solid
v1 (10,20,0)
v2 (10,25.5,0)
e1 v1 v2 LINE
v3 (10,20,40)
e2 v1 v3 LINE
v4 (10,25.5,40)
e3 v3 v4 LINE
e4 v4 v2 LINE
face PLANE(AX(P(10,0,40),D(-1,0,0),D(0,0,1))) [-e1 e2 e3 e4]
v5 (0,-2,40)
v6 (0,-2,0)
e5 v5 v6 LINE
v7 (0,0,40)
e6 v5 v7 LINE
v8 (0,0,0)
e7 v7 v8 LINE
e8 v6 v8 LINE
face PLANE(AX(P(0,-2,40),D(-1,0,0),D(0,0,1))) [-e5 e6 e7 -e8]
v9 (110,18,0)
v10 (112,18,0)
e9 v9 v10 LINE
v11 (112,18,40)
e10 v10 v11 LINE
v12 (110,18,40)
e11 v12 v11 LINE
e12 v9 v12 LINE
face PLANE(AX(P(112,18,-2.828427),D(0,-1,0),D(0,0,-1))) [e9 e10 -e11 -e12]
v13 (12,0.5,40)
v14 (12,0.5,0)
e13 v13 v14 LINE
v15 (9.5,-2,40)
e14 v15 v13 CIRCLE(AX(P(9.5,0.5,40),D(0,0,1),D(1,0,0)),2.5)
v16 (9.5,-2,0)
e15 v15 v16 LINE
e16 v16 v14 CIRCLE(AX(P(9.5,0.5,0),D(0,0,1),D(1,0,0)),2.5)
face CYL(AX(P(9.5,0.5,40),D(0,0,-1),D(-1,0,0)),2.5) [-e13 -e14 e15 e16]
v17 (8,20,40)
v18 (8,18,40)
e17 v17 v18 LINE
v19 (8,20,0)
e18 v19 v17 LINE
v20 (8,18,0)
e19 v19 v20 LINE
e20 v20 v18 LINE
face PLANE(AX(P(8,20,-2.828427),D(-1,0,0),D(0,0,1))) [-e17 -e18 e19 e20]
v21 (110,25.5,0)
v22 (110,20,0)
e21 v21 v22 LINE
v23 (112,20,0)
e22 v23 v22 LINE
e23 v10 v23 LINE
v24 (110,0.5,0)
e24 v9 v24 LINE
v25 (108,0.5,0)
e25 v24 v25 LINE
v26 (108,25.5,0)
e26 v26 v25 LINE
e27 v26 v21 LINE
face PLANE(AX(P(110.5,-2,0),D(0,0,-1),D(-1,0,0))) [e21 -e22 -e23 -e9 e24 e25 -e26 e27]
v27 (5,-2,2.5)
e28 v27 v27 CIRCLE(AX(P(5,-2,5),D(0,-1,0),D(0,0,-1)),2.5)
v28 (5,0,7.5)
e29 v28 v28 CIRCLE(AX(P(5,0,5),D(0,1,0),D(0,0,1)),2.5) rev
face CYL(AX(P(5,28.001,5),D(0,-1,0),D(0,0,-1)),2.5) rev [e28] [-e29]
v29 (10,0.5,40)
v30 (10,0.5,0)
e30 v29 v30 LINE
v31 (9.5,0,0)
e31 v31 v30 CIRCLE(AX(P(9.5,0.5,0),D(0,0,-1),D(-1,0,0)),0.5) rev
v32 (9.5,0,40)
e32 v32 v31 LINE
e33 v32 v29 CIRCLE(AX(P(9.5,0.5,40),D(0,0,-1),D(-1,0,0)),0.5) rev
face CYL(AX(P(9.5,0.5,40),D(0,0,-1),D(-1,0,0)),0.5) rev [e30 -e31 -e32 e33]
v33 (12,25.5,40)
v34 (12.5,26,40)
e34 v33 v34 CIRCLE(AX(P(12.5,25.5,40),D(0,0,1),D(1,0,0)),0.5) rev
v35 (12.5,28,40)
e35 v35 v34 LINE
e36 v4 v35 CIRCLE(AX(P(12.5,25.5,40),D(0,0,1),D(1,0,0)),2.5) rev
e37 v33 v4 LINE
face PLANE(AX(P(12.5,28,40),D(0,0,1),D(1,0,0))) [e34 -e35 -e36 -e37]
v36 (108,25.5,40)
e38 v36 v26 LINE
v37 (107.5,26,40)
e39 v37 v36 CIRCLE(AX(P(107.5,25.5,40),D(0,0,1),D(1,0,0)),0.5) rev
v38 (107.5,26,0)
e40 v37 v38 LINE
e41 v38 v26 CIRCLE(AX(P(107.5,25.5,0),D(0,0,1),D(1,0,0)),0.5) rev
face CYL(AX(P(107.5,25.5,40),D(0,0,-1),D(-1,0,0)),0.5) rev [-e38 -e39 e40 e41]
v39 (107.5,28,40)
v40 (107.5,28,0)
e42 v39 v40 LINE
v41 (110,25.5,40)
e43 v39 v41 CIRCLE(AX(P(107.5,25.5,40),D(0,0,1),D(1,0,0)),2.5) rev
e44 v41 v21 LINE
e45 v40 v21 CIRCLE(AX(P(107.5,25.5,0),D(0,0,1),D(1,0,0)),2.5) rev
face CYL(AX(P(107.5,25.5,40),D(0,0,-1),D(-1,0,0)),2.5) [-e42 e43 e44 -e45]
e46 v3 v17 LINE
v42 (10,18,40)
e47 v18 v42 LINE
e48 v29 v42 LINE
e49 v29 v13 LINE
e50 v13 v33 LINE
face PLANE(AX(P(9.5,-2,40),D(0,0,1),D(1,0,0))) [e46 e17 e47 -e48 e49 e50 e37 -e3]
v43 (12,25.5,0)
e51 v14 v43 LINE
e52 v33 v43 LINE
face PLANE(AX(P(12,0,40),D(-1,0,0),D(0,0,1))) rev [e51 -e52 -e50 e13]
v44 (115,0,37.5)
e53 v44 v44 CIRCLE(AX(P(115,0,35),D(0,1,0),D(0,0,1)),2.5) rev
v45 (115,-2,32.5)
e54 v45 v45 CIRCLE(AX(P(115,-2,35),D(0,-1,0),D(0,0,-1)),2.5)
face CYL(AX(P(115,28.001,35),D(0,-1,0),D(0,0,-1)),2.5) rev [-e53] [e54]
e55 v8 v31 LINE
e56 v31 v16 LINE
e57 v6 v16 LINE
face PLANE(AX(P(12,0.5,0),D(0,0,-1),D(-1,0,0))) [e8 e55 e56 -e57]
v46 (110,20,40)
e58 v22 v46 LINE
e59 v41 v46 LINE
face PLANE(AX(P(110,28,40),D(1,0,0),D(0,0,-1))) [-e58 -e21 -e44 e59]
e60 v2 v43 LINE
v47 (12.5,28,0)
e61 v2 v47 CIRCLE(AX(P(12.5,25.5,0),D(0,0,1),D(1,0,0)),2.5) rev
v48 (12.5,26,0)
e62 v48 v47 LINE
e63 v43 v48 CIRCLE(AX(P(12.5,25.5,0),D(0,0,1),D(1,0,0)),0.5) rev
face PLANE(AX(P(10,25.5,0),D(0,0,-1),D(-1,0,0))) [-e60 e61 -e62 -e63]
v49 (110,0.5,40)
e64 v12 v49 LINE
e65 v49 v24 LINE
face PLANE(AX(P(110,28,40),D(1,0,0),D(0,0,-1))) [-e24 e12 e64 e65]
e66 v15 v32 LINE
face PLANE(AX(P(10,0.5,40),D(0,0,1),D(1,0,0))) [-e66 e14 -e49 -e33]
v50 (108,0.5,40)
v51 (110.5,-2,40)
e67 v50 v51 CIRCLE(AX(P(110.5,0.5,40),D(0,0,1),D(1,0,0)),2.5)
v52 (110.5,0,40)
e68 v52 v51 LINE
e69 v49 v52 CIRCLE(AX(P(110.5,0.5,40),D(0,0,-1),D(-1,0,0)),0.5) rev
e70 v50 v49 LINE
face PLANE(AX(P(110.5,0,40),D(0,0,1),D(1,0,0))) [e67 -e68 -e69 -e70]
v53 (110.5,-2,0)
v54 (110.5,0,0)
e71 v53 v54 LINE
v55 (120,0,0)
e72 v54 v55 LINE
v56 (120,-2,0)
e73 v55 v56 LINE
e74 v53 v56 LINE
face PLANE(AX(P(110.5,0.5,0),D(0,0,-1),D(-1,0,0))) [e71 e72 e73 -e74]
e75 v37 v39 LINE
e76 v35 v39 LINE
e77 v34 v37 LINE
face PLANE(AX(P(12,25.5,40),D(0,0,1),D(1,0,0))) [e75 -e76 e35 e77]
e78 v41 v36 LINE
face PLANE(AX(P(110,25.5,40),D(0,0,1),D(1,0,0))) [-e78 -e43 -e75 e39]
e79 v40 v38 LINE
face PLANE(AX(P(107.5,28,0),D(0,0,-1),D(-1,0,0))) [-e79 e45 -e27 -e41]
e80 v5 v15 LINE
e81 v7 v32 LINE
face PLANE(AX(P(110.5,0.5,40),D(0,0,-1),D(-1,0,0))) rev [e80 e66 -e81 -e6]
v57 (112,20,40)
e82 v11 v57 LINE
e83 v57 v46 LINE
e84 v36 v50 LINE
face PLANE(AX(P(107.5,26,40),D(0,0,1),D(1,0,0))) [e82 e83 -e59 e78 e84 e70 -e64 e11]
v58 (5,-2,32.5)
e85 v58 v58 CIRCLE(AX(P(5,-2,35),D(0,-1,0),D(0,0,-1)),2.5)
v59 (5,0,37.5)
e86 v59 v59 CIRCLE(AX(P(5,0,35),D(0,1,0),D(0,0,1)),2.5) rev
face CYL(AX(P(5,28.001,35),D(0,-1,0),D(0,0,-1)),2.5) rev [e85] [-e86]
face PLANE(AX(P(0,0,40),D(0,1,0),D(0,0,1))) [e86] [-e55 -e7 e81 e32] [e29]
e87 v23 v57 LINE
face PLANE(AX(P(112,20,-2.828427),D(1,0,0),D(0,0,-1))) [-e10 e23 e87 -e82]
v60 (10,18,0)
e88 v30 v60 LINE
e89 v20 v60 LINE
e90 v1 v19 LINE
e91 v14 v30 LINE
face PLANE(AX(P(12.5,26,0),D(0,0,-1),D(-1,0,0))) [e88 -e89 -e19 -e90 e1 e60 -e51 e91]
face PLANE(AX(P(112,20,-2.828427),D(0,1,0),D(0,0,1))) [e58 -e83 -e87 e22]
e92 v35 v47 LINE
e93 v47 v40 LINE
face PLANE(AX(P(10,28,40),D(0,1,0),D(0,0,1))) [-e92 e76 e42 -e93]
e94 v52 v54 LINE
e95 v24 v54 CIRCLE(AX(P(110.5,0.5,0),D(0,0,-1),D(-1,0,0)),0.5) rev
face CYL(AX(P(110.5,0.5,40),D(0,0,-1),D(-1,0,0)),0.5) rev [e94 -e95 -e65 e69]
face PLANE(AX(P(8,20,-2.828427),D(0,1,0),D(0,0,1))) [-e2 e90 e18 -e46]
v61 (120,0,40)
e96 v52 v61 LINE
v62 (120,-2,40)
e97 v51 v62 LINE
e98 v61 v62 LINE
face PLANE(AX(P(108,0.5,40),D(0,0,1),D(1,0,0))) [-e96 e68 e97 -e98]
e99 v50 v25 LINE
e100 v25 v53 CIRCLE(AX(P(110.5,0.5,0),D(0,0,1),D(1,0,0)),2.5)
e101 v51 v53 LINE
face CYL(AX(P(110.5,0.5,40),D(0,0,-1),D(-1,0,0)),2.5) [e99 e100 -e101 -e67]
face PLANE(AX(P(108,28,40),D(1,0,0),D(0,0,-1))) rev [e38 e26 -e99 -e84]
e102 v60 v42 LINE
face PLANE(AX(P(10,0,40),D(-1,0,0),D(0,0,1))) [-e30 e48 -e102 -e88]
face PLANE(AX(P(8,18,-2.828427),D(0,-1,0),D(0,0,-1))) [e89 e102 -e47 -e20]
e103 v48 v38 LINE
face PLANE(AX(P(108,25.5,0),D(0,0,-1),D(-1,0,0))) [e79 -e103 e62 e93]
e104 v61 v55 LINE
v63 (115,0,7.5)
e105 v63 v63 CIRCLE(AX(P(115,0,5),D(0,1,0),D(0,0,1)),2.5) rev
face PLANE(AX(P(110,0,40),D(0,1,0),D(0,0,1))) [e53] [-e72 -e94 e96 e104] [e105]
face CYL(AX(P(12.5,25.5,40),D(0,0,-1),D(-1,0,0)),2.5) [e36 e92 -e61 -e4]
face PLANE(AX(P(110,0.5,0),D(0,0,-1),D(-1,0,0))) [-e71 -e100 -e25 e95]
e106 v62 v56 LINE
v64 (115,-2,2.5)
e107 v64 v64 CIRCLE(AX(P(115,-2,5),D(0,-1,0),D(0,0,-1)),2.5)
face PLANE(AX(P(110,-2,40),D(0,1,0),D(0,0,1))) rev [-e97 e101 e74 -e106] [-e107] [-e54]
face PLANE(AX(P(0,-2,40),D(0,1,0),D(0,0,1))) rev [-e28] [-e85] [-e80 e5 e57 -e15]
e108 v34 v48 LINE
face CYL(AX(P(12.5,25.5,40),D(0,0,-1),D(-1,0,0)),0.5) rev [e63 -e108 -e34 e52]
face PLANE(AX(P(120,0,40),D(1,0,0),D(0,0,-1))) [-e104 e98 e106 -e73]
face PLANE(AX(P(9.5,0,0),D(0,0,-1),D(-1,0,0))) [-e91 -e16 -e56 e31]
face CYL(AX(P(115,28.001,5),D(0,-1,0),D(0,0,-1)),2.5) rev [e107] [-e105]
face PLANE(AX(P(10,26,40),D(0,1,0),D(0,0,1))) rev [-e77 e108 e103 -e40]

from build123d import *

# Parameters (mm, degrees)
BASE_FLANGE1_DEPTH  = 40
CUT_EXTRUDE1_REACH  = 132
SKETCH6_R           = 2.5
SKETCH7_W           = 2
SKETCH7_H           = 2
BOSS_EXTRUDE1_DEPTH = 40


# Sheet-metal steps are written as plain solids
with BuildPart() as part:
    # Sketch1 → Base-Flange1 (new body)
    with BuildSketch(Plane.XY):
        with BuildLine():
            Line((0, 0), (9.5, 0))
            ThreePointArc((9.5, 0), (9.853553391, 0.146446609), (10, 0.5))
            Line((10, 0.5), (10, 25.5))
            ThreePointArc((10, 25.5), (10.732233047, 27.267766953), (12.5, 28))
            Line((12.5, 28), (107.5, 28))
            ThreePointArc((107.5, 28), (109.267766953, 27.267766953), (110, 25.5))
            Line((110, 25.5), (110, 0.5))
            ThreePointArc((110, 0.5), (110.146446609, 0.146446609), (110.5, 0))
            Line((110.5, 0), (120, 0))
            Line((120, 0), (120, -2))
            Line((120, -2), (110.5, -2))
            ThreePointArc((110.5, -2), (108.732233047, -1.267766953), (108, 0.5))
            Line((108, 0.5), (108, 25.5))
            ThreePointArc((108, 25.5), (107.853553391, 25.853553391), (107.5, 26))
            Line((107.5, 26), (12.5, 26))
            ThreePointArc((12.5, 26), (12.146446609, 25.853553391), (12, 25.5))
            Line((12, 25.5), (12, 0.5))
            ThreePointArc((12, 0.5), (11.267766953, -1.267766953), (9.5, -2))
            Line((9.5, -2), (0, -2))
            Line((0, -2), (0, 0))
        make_face()
    extrude(amount=BASE_FLANGE1_DEPTH)

    # Sketch6 → Cut-Extrude1 (cut, up to next)
    with BuildSketch(Plane.XZ.offset(2), mode=Mode.PRIVATE) as cut_extrude1_sk1:
        with Locations(Location((5, 35, 0), (0, 0, 270))):
            Circle(SKETCH6_R)
    cut_extrude1_tool1 = extrude(cut_extrude1_sk1.sketch, amount=-CUT_EXTRUDE1_REACH, mode=Mode.PRIVATE) & part.part
    # Sketch6 → Cut-Extrude1 (cut, up to next)
    with BuildSketch(Plane.XZ.offset(2), mode=Mode.PRIVATE) as cut_extrude1_sk2:
        with Locations(Location((5, 5, 0), (0, 0, 270))):
            Circle(SKETCH6_R)
    cut_extrude1_tool2 = extrude(cut_extrude1_sk2.sketch, amount=-CUT_EXTRUDE1_REACH, mode=Mode.PRIVATE) & part.part
    # Sketch6 → Cut-Extrude1 (cut, up to next)
    with BuildSketch(Plane.XZ.offset(2), mode=Mode.PRIVATE) as cut_extrude1_sk3:
        with Locations(Location((115, 5, 0), (0, 0, 270))):
            Circle(SKETCH6_R)
    cut_extrude1_tool3 = extrude(cut_extrude1_sk3.sketch, amount=-CUT_EXTRUDE1_REACH, mode=Mode.PRIVATE) & part.part
    # Sketch6 → Cut-Extrude1 (cut, up to next)
    with BuildSketch(Plane.XZ.offset(2), mode=Mode.PRIVATE) as cut_extrude1_sk4:
        with Locations(Location((115, 35, 0), (0, 0, 270))):
            Circle(SKETCH6_R)
    cut_extrude1_tool4 = extrude(cut_extrude1_sk4.sketch, amount=-CUT_EXTRUDE1_REACH, mode=Mode.PRIVATE) & part.part
    add(cut_extrude1_tool1.solids().sort_by_distance((5, -2, 35))[0], mode=Mode.SUBTRACT)
    add(cut_extrude1_tool2.solids().sort_by_distance((5, -2, 5))[0], mode=Mode.SUBTRACT)
    add(cut_extrude1_tool3.solids().sort_by_distance((115, -2, 5))[0], mode=Mode.SUBTRACT)
    add(cut_extrude1_tool4.solids().sort_by_distance((115, -2, 35))[0], mode=Mode.SUBTRACT)

    # Sketch7 → Boss-Extrude1 (add)
    with BuildSketch(Plane.XY.offset(40)):
        with Locations((9, 19)):
            Rectangle(SKETCH7_W, SKETCH7_H)
        with Locations((111, 19)):
            Rectangle(SKETCH7_W, SKETCH7_H)
    extrude(amount=-BOSS_EXTRUDE1_DEPTH)


solid = part.part
